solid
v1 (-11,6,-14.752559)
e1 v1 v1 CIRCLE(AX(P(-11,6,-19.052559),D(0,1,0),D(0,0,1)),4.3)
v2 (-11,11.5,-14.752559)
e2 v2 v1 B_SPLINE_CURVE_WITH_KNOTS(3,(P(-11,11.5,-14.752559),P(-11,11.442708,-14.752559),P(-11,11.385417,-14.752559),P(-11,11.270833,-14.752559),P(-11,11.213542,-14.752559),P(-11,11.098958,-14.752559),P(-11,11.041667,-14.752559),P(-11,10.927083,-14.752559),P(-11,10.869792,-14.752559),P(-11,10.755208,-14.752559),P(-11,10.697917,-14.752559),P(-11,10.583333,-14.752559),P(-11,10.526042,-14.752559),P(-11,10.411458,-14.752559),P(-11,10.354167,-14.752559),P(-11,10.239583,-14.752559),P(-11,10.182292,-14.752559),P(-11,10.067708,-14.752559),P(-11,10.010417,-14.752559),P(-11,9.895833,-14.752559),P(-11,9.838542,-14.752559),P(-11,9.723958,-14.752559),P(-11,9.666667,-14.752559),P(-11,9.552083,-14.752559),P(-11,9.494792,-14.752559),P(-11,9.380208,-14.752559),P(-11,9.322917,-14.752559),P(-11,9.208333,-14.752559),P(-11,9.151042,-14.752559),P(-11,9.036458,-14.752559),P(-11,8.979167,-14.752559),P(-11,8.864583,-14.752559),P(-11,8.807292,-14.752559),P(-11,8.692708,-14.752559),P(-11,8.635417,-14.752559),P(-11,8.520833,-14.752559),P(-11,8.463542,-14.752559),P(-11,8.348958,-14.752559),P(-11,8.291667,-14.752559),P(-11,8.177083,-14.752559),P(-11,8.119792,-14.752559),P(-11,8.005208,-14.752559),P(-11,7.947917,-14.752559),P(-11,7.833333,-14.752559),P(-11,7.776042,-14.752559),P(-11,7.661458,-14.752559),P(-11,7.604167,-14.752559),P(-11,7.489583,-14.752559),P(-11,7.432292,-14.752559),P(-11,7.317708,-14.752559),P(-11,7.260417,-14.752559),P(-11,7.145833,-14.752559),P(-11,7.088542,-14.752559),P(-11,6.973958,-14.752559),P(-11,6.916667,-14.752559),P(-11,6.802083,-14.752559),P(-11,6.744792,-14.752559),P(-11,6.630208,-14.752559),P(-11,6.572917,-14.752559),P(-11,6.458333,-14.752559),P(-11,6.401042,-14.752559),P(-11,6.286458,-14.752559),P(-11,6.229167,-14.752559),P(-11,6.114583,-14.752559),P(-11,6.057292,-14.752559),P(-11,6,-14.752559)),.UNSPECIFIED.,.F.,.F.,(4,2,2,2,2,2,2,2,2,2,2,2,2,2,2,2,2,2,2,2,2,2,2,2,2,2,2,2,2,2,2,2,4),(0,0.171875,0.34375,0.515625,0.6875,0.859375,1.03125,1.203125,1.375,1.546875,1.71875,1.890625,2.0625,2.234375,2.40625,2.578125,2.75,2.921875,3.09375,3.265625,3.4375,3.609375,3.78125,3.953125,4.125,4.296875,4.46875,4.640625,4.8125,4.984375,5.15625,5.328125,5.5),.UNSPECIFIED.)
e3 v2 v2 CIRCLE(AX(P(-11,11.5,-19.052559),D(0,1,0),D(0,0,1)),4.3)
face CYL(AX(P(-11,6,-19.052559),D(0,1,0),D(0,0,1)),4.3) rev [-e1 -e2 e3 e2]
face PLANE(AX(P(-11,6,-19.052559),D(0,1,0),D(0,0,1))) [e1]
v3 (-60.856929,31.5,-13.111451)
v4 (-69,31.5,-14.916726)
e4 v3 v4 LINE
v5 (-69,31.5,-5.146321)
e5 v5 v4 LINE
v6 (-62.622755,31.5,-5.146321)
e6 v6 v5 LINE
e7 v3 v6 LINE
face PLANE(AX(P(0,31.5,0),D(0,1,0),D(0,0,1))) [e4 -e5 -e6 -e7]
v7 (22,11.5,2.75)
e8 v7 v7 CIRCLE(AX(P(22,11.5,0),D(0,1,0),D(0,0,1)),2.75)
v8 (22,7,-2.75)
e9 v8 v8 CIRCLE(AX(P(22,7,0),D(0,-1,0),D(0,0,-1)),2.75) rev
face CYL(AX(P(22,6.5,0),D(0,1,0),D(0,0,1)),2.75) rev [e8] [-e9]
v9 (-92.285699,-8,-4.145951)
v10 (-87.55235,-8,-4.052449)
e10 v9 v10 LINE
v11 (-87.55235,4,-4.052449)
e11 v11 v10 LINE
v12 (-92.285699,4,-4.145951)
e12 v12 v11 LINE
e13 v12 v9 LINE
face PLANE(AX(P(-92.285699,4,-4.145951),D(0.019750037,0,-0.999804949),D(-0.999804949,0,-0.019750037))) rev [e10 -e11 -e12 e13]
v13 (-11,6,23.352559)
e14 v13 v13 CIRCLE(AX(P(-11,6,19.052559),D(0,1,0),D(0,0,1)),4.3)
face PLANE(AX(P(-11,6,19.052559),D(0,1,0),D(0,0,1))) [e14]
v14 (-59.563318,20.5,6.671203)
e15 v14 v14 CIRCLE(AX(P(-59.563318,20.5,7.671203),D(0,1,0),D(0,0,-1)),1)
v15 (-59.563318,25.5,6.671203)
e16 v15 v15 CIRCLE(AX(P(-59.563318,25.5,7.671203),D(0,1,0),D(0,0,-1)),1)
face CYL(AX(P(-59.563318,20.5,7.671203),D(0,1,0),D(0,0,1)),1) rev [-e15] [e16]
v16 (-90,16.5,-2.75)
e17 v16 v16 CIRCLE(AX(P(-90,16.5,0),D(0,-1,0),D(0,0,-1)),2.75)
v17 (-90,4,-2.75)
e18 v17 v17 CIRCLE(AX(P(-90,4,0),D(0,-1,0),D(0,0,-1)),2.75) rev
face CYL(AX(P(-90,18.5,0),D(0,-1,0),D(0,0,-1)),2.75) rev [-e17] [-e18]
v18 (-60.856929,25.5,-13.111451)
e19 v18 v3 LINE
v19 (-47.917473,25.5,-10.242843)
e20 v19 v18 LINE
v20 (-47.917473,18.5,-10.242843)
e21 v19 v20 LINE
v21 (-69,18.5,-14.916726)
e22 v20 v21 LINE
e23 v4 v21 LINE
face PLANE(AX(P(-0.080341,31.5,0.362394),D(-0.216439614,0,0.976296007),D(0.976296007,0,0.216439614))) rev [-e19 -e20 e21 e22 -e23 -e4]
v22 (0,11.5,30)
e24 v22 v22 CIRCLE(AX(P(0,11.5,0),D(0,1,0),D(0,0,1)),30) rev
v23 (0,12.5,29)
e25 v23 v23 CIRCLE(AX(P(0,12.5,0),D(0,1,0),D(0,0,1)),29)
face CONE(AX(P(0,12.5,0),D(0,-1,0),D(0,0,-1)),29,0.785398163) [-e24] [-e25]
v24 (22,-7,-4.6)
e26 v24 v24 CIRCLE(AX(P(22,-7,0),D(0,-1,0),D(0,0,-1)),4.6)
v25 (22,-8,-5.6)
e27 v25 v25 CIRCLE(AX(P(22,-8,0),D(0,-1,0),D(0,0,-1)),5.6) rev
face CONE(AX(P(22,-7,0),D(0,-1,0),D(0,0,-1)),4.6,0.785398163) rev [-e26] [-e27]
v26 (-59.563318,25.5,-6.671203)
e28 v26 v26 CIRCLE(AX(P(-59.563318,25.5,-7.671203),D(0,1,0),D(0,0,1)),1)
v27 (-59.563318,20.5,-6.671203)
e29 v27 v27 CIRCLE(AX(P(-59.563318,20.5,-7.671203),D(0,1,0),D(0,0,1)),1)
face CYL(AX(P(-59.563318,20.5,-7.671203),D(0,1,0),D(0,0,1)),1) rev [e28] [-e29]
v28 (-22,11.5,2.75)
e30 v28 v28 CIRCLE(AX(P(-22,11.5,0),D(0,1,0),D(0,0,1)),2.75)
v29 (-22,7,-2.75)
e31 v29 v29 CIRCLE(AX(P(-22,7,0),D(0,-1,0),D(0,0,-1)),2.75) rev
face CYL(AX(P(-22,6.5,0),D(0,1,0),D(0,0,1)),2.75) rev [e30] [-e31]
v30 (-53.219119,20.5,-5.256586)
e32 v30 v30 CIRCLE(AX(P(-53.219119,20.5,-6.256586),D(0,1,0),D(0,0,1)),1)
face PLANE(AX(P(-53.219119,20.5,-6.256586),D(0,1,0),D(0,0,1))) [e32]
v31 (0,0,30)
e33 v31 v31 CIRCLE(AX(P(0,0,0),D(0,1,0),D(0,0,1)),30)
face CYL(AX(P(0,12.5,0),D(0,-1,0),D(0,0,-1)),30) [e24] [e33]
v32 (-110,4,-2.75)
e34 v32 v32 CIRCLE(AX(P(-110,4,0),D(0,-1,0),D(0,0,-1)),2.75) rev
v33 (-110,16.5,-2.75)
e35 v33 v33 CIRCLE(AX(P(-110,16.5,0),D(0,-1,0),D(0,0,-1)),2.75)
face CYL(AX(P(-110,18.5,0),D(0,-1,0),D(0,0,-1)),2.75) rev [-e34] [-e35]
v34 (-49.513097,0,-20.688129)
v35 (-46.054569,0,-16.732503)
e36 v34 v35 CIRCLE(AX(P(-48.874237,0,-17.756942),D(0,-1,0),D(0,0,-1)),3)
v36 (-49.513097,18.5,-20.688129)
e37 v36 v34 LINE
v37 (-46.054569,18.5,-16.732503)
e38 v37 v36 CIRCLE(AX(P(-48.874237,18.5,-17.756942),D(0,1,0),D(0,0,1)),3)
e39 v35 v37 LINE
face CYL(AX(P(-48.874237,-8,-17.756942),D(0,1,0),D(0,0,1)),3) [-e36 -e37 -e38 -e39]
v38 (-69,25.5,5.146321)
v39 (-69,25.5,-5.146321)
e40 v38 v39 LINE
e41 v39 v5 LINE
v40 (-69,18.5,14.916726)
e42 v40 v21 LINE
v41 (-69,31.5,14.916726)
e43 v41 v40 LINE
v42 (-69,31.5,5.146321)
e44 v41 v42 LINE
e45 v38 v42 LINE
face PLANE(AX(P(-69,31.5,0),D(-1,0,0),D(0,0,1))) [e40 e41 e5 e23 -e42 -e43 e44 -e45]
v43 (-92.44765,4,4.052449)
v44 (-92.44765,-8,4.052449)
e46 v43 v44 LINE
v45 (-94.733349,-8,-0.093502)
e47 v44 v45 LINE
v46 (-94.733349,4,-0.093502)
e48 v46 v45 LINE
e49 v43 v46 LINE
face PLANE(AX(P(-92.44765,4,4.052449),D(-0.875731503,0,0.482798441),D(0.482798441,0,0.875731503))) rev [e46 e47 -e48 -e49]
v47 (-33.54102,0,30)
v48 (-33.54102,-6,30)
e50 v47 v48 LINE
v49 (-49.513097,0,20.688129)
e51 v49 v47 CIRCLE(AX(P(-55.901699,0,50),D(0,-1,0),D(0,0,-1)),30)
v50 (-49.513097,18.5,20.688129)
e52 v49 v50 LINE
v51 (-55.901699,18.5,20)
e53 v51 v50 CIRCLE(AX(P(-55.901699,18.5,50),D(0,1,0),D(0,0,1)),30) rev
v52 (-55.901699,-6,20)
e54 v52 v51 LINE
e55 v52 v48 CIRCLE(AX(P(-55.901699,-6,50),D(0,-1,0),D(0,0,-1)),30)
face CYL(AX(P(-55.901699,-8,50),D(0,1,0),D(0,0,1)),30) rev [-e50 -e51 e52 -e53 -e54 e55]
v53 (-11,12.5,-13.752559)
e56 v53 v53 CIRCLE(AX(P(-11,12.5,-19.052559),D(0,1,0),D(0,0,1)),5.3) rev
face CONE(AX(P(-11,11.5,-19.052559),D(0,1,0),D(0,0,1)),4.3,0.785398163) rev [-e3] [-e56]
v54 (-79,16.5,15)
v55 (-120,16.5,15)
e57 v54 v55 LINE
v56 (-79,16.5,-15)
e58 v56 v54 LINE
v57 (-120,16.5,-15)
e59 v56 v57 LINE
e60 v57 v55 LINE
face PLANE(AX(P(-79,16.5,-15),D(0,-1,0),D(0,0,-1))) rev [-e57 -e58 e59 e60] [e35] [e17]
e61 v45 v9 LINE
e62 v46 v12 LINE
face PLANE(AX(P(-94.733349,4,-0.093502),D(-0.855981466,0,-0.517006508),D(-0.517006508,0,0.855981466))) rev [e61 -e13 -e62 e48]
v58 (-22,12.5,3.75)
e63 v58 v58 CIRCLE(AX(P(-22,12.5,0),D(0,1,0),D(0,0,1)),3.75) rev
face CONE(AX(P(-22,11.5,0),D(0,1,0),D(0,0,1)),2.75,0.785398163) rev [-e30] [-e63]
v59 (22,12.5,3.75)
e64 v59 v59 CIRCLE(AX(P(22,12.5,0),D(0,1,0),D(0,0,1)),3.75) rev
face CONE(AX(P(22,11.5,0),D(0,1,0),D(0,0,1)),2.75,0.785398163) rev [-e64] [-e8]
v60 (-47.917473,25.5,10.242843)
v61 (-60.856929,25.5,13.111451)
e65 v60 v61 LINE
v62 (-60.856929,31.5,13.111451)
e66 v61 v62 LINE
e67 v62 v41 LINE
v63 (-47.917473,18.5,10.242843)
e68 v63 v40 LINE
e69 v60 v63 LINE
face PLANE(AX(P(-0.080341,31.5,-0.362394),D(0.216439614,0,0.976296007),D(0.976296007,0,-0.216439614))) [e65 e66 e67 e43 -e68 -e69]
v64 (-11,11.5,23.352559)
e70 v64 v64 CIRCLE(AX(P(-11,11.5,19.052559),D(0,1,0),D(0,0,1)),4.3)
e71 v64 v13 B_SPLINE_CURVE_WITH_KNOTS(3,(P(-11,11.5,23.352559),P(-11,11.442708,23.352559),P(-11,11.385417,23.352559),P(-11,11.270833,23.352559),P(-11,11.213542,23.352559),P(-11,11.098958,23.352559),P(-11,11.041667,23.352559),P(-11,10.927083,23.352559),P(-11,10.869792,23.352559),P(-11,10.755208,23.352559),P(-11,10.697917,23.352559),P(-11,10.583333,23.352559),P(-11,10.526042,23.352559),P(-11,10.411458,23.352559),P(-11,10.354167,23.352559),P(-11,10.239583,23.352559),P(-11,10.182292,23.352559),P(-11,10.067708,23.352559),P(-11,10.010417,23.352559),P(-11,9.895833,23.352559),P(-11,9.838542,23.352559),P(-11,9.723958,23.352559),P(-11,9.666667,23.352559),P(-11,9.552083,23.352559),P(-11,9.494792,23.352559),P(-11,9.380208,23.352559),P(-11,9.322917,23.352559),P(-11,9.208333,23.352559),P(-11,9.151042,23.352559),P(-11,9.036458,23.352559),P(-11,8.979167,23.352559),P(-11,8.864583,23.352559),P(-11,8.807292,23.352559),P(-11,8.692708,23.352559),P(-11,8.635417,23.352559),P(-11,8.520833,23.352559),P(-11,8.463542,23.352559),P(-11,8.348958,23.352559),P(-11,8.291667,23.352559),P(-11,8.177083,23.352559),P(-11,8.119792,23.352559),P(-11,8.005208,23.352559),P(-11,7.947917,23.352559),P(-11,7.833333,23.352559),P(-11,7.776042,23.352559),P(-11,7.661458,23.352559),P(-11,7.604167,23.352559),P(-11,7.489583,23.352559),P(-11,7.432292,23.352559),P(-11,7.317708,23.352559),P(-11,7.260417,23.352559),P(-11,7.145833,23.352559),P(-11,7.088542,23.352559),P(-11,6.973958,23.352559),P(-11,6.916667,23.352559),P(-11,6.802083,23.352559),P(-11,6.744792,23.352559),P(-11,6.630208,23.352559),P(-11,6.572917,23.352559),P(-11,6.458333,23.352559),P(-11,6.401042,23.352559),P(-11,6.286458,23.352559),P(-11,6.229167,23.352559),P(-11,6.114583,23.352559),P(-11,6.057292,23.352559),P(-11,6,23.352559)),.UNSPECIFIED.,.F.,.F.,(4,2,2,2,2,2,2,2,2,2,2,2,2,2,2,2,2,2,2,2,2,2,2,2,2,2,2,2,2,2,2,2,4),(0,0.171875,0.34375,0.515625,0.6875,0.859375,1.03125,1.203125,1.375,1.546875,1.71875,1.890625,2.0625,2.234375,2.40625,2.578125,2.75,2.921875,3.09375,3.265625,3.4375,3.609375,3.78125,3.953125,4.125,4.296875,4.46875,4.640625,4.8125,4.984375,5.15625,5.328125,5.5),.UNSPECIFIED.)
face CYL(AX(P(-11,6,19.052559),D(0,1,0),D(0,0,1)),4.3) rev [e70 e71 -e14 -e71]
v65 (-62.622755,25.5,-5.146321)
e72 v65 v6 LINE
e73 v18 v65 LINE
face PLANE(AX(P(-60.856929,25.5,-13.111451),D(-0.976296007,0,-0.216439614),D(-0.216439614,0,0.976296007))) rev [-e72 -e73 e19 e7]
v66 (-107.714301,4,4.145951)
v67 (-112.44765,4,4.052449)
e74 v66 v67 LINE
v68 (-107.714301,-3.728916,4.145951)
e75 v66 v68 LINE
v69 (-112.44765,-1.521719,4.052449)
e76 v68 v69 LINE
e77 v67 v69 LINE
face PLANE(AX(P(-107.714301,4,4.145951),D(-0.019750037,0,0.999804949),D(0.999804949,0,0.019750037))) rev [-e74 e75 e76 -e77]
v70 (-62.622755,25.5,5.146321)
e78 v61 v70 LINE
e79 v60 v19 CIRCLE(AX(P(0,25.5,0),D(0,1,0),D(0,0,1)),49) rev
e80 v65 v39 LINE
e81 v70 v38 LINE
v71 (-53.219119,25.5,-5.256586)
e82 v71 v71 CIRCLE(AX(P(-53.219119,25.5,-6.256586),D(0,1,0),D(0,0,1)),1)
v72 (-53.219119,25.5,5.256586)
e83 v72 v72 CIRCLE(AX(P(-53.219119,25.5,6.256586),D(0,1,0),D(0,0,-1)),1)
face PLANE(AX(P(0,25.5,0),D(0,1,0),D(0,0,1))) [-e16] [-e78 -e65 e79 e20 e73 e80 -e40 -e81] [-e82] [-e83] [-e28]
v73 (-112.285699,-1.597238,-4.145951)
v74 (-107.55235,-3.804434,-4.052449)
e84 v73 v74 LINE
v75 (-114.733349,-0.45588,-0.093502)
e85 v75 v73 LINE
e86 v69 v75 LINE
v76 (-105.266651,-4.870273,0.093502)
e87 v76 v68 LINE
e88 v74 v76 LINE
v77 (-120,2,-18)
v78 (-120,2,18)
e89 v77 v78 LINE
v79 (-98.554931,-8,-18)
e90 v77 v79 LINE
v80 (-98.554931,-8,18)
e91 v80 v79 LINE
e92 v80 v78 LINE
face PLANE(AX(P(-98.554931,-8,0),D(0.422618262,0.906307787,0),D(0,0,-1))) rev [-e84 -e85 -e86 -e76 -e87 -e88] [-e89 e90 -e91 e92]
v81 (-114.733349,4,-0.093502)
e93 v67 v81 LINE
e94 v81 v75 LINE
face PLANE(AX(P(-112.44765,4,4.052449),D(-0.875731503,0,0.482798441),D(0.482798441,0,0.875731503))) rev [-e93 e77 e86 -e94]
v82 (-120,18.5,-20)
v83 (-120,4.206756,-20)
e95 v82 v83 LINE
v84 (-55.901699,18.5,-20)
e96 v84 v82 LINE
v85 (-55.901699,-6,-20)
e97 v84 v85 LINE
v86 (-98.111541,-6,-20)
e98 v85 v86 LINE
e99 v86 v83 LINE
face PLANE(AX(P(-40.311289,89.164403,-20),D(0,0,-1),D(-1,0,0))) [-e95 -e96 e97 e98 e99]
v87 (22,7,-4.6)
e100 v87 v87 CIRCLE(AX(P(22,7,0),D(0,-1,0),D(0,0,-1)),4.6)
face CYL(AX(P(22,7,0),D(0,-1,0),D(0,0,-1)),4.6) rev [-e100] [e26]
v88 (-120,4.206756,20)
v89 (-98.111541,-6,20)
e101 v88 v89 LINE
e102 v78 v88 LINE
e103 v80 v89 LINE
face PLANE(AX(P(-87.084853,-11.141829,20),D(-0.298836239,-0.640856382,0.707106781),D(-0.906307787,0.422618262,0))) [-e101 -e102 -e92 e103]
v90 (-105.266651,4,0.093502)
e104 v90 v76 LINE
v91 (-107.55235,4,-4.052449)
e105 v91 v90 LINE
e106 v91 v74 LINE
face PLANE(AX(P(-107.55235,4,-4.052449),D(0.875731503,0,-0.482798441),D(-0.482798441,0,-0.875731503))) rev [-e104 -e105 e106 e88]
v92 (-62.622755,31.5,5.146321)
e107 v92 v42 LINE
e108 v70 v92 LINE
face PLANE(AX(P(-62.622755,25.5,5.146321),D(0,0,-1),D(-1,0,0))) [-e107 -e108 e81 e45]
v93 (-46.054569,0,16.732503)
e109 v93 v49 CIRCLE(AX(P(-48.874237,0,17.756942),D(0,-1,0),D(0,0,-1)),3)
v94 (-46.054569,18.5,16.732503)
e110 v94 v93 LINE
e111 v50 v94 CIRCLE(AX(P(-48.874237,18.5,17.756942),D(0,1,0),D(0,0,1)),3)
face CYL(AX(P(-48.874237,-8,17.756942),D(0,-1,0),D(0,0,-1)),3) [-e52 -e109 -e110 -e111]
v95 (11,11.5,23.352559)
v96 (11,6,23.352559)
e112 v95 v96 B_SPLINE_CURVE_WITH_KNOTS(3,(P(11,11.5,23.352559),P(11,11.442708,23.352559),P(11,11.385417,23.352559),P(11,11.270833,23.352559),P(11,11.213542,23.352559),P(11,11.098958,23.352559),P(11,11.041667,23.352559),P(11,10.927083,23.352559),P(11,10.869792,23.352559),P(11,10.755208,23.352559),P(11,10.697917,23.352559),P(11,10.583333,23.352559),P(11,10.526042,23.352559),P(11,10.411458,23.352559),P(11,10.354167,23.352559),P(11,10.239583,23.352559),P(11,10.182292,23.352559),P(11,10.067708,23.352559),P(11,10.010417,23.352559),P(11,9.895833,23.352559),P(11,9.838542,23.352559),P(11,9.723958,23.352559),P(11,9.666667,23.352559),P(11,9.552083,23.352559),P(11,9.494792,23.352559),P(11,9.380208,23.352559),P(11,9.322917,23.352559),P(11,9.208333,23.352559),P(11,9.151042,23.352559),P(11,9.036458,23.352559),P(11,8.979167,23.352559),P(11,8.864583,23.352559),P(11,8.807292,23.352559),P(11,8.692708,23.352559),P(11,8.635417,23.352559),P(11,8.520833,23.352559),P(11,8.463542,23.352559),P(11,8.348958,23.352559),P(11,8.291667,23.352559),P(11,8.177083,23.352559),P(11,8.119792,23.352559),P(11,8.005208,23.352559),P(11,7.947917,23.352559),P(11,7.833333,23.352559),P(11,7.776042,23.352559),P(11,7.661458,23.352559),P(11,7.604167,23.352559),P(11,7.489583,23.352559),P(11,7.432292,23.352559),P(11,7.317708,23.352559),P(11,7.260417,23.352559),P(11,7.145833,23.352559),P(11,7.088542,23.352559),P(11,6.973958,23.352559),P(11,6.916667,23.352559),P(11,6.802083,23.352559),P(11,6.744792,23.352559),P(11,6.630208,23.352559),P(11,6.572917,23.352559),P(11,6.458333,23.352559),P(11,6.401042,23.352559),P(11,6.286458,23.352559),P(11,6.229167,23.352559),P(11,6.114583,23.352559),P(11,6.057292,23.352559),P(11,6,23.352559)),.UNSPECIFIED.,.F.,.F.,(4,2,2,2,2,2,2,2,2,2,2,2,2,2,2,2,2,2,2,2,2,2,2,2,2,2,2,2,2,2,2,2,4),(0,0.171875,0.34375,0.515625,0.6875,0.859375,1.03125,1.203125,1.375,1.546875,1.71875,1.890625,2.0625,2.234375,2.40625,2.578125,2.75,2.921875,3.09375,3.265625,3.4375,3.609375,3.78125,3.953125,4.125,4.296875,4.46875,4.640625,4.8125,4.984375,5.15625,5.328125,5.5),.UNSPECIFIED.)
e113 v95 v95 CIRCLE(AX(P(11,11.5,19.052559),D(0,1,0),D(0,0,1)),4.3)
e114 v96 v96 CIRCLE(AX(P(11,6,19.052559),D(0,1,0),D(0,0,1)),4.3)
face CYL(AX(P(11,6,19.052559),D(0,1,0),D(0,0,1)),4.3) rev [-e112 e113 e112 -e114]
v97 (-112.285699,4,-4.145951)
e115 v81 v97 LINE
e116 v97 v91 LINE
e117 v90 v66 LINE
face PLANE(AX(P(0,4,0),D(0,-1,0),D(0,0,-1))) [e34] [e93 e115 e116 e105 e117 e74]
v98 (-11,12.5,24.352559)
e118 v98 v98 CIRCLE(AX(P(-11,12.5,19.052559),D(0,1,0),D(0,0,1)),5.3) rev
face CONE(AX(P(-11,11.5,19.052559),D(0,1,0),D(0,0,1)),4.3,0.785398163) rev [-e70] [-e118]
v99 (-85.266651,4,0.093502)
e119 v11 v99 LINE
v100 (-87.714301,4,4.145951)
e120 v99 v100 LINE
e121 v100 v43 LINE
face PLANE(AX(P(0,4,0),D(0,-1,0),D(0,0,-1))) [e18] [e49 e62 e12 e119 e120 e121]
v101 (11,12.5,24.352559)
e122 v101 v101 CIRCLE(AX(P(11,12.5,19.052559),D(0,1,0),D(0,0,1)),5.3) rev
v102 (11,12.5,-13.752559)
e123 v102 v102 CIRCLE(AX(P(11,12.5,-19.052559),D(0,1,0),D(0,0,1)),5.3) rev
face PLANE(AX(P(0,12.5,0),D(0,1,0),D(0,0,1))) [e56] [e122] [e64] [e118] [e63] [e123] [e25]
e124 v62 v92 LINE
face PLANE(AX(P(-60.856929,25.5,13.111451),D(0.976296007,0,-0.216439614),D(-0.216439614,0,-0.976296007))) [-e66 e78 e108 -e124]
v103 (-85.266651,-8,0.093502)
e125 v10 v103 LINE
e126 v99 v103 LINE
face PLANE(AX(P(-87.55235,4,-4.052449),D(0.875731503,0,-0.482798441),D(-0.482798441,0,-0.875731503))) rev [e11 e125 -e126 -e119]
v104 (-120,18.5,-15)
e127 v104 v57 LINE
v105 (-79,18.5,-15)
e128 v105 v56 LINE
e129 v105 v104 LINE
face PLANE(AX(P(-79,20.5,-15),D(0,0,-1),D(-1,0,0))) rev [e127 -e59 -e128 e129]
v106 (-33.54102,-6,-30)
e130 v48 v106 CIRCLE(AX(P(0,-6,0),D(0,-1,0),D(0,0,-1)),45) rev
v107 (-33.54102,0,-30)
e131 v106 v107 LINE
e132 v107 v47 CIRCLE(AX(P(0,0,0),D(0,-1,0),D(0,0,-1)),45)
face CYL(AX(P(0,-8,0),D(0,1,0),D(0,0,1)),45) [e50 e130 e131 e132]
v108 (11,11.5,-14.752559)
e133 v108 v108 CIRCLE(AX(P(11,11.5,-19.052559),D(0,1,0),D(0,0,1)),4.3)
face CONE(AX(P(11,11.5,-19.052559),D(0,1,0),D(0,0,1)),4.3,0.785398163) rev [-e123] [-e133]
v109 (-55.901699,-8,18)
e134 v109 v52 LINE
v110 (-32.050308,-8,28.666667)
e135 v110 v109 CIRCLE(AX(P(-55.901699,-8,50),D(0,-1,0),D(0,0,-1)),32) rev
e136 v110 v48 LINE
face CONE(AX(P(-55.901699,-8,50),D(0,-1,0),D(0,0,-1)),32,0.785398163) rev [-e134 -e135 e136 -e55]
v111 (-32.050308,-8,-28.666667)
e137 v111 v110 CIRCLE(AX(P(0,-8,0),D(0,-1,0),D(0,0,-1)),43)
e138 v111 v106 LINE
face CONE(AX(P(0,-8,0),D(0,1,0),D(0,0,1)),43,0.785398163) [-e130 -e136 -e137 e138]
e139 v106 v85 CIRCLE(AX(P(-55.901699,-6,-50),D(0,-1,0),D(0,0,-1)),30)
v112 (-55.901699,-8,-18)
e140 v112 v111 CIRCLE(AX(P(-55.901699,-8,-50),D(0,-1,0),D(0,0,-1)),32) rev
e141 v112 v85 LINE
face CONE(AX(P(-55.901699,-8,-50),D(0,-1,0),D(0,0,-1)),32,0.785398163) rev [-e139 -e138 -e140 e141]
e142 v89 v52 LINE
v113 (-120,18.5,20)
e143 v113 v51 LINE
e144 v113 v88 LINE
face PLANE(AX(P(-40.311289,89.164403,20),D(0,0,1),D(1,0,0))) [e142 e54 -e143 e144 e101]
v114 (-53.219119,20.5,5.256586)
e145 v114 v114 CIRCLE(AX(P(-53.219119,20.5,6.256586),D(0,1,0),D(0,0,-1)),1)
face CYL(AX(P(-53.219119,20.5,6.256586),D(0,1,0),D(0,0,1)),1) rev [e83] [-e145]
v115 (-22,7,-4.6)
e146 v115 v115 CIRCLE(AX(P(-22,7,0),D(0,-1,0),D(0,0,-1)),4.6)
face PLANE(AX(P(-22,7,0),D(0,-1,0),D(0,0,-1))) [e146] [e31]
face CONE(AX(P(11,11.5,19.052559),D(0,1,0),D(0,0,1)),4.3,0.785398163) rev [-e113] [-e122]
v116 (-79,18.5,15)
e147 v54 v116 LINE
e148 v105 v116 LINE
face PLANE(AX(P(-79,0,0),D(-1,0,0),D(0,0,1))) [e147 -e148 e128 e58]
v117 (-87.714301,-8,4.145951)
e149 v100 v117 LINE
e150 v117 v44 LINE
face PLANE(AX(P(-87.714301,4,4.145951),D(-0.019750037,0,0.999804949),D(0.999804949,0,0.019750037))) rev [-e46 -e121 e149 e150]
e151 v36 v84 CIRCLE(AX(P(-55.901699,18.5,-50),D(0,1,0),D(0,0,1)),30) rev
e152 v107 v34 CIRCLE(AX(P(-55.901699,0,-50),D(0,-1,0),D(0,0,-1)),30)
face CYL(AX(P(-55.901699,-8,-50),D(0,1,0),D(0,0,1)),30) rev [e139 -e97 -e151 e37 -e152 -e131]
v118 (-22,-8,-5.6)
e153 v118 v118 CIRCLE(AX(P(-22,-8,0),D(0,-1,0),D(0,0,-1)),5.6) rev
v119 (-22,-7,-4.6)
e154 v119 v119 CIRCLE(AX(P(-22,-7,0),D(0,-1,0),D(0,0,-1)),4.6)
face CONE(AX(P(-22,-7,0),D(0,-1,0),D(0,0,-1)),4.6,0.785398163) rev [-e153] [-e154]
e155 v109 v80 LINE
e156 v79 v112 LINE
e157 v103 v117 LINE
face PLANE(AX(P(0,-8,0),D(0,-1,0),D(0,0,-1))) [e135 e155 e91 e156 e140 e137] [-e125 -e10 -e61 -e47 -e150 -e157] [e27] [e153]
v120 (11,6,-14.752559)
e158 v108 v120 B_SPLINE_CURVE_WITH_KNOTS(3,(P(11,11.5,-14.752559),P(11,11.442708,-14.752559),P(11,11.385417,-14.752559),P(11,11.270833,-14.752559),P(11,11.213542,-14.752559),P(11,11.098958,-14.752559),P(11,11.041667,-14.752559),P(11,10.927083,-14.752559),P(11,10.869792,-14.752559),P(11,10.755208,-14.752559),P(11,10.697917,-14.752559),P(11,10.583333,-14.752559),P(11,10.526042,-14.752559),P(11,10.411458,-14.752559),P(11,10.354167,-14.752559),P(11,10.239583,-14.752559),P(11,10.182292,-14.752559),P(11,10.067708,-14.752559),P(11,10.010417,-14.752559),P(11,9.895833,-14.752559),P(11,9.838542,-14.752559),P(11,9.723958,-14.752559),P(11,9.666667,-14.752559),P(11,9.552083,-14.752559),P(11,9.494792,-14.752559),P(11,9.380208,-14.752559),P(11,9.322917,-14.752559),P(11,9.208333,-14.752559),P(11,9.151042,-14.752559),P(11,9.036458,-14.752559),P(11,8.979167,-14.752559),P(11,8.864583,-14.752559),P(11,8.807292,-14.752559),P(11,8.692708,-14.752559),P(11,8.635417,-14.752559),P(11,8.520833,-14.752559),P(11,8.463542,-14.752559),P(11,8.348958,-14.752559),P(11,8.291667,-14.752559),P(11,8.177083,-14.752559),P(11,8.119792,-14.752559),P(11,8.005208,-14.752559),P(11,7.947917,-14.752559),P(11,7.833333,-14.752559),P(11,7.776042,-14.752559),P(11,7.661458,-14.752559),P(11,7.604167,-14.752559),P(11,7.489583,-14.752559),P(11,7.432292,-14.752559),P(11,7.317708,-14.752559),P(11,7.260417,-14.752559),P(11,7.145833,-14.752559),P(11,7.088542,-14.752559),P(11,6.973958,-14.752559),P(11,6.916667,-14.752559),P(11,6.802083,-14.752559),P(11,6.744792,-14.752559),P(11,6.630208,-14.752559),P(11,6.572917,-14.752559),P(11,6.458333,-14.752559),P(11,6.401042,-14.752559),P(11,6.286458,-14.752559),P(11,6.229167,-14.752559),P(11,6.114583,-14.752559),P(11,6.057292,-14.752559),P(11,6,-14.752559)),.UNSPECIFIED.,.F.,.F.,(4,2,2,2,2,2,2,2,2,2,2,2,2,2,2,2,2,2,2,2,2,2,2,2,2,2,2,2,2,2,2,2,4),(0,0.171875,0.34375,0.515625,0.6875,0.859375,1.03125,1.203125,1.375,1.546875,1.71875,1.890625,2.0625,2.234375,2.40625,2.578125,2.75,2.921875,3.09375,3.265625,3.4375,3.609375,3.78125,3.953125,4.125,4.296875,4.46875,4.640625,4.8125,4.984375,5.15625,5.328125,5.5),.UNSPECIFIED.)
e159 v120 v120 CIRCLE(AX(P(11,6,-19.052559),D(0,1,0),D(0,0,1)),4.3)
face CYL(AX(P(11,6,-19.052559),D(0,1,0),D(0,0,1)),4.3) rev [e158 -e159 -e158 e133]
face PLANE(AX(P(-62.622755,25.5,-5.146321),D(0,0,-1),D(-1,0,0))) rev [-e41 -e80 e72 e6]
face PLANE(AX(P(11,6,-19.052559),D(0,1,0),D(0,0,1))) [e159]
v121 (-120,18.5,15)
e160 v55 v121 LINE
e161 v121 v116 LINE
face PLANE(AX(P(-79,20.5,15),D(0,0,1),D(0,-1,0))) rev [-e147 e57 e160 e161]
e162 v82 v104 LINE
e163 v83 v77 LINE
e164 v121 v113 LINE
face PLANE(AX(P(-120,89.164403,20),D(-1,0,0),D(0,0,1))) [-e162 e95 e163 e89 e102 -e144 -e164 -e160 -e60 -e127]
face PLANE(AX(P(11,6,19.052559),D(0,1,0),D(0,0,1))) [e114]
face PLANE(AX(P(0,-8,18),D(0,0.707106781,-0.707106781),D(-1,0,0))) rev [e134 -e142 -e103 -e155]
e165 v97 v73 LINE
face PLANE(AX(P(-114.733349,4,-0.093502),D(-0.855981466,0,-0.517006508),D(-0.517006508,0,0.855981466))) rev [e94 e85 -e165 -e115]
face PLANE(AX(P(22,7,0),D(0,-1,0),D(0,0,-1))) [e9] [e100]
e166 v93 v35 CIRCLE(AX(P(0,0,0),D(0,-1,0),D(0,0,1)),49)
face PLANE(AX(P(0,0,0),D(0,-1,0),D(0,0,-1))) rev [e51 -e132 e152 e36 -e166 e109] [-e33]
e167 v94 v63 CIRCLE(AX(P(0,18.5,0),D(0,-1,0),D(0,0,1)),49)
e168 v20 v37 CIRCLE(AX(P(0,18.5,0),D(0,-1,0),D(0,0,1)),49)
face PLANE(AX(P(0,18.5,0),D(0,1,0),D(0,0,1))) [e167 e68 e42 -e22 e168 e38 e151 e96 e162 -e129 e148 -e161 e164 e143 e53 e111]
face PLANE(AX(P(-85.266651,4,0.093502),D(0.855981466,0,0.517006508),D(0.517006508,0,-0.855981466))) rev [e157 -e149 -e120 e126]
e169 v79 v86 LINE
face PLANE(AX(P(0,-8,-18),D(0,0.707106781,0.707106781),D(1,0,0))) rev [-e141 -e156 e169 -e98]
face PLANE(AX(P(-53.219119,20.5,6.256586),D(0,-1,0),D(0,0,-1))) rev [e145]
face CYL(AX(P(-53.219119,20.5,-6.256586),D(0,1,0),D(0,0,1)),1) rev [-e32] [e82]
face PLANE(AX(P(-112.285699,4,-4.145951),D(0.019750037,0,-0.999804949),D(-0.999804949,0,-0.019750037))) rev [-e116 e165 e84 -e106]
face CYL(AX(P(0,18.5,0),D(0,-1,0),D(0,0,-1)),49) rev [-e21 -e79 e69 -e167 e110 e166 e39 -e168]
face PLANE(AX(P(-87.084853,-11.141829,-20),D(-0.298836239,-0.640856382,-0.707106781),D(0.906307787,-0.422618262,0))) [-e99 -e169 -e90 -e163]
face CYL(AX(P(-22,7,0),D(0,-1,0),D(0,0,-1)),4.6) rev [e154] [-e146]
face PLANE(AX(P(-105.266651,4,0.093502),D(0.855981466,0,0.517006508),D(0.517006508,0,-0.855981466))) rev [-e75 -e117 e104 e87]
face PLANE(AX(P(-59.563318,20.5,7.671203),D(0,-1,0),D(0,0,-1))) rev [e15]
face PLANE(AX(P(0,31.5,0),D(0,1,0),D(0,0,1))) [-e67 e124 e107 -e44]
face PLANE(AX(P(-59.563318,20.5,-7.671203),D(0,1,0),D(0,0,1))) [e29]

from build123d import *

# Parameters (mm, degrees)
SKETCH1_R           = 30
BOSS_EXTRUDE1_DEPTH = 12.5
SKETCH3_R           = 45.00000000000001
BOSS_EXTRUDE3_DEPTH = 8
SKETCH17_R          = 2.7499999999999982
CUT_EXTRUDE9_DEPTH  = 6
SKETCH19_R          = 4.3
SKETCH19_R_2        = 4.299999999999999
CUT_EXTRUDE12_DEPTH = 6.5
BOSS_EXTRUDE5_START = -8
BOSS_EXTRUDE5_DEPTH = 8
BOSS_EXTRUDE6_DEPTH = 18.5
FILLET1_R           = 30
CUT_EXTRUDE14_DEPTH = 41
SKETCH26_R          = 2.750000000000008
CUT_EXTRUDE15_DEPTH = 131.87111980876452
CUT_EXTRUDE16_DEPTH = 12
BOSS_EXTRUDE7_DEPTH = 13
CUT_EXTRUDE21_DEPTH = 6
SKETCH34_R          = 0.9999999999999991
SKETCH34_R_2        = 0.9999999999999933
SKETCH34_R_3        = 0.9999999999999983
SKETCH34_R_4        = 0.9999999999999981
CUT_EXTRUDE22_DEPTH = 5
CHAMFER4_SIZE       = 1
CHAMFER5_SIZE       = 1
SKETCH35_R          = 4.599999999999999
CUT_EXTRUDE23_DEPTH = 15
FILLET3_R           = 3
CHAMFER6_SIZE       = 21.445069205
CHAMFER6_SIZE_2     = 10
CHAMFER7_SIZE       = 2
CHAMFER8_SIZE       = 1
SKETCH37_W          = 12.834846050171066
SKETCH37_H          = 29.012722943474188
CUT_EXTRUDE24_DEPTH = 15


with BuildPart() as part:
    # Sketch1 → Boss-Extrude1 (new body)
    with BuildSketch(Plane(origin=(0, 0, 0), x_dir=(1, 0, 0), z_dir=(0, 1, 0))):
        with Locations(Location((0, 0, 0), (0, 0, 270))):
            Circle(SKETCH1_R)
    extrude(amount=BOSS_EXTRUDE1_DEPTH)

    # Sketch3 → Boss-Extrude3 (add)
    with BuildSketch(Plane.XZ):
        with Locations(Location((0, 0, 0), (0, 0, 270))):
            Circle(SKETCH3_R)
    extrude(amount=BOSS_EXTRUDE3_DEPTH)

    # Sketch17 → Cut-Extrude9 (cut)
    with BuildSketch(Plane(origin=(0, 12.5, 0), x_dir=(1, 0, 0), z_dir=(0, 1, 0))):
        with Locations(Location((22, 2.69e-15, 0), (0, 0, 270))):
            Circle(SKETCH17_R)
        with Locations(Location((-22, 0, 0), (0, 0, 270))):
            Circle(SKETCH17_R)
    extrude(amount=-CUT_EXTRUDE9_DEPTH, mode=Mode.SUBTRACT)

    # Sketch19 → Cut-Extrude12 (cut)
    with BuildSketch(Plane(origin=(0, 12.5, 0), x_dir=(1, 0, 0), z_dir=(0, 1, 0))):
        with Locations(Location((-10.999999999999986, -19.05255888325766, 0), (0, 0, 270))):
            Circle(SKETCH19_R)
        with Locations(Location((11.00000000000001, -19.05255888325765, 0), (0, 0, 270))):
            Circle(SKETCH19_R_2)
        with Locations(Location((10.999999999999993, 19.052558883257653, 0), (0, 0, 270))):
            Circle(SKETCH19_R_2)
        with Locations(Location((-11.000000000000007, 19.05255888325765, 0), (0, 0, 270))):
            Circle(SKETCH19_R)
    extrude(amount=-CUT_EXTRUDE12_DEPTH, mode=Mode.SUBTRACT)

    # Sketch22 → Boss-Extrude5 (add)
    with BuildSketch(Plane.XZ.offset(8).offset(BOSS_EXTRUDE5_START)):
        with BuildLine():
            Line((-40.31128874149275, 20), (-120, 19.999999999999993))
            Line((-120, 19.999999999999993), (-120, -20.000000000000007))
            Line((-120, -20.000000000000007), (-40.31128874149276, -20))
            ThreePointArc((-40.31128874149276, -20), (-45.00000000000001, 5.51e-15), (-40.31128874149275, 20))
        make_face()
    extrude(amount=BOSS_EXTRUDE5_DEPTH)

    # Sketch24 → Boss-Extrude6 (add)
    with BuildSketch(Plane(origin=(0, 0, 0), x_dir=(1, 0, 0), z_dir=(0, 1, 0))):
        with BuildLine():
            Line((-120, -20), (-44.73253849269008, -20))
            ThreePointArc((-44.73253849269008, -20), (-49, 6e-15), (-44.73253849269009, 19.999999999999986))
            Line((-44.73253849269009, 19.999999999999986), (-120, 20))
            Line((-120, 20), (-120, -20))
        make_face()
    extrude(amount=BOSS_EXTRUDE6_DEPTH)

    # Fillet1
    # the kernel refuses this fillet: 30 mm, written as the material it adds along each edge
    with BuildSketch(Plane(origin=(-40.31128874149275, 38.97602674000499, -20.000000000000004), x_dir=(0.5606253720867512, 0, -0.8280695575690438), z_dir=(0, -1, 0))) as fillet1_piece_1_section:
        with BuildLine():
            CenterArc((16.10170692963991, -29.728705649960602), FILLET1_R, 97.7112574672678, 48.1896851042214)
            Line((-8.740379797431398, -12.90994448735806), (0, 0))
            ThreePointArc((0, 0), (6.038140098614967, -0.4069415250591067), (12.076280197229933, 2.1e-16))
        make_face()
    fillet1_piece_1 = extrude(amount=46.97602674000499, mode=Mode.PRIVATE)
    fillet1_piece_1 = split(fillet1_piece_1, bisect_by=Plane(origin=(-48.427696817915454, 0, -20.33565433426988), z_dir=(0, 1, 0)), keep=Keep.TOP, mode=Mode.PRIVATE)
    fillet1_piece_1 = fillet1_piece_1 - Plane(origin=(8.882e-14, 9.24999999999995, -1.78e-15), x_dir=(-0.9129089488304102, 0, 0.4081632653061218), z_dir=(0, -1, 0)) * Cylinder(49.00000000000008, 146, mode=Mode.PRIVATE)
    fillet1_piece_1 = split(fillet1_piece_1, bisect_by=Plane(origin=(-48.427696817915454, 18.5, -20.33565433426988), z_dir=(0, -1, 0)), keep=Keep.TOP, mode=Mode.PRIVATE)
    add(fillet1_piece_1)
    with BuildSketch(Plane(origin=(-40.31128874149276, 0, -20), x_dir=(0.5606253720867515, 0, -0.8280695575690435), z_dir=(0, -1, 0))) as fillet1_piece_2_section:
        with BuildLine():
            CenterArc((16.101706929639906, -29.728705649960602), FILLET1_R, 97.71125746726779, 48.18968510422141)
            Line((-8.740379797431395, -12.909944487358054), (0, 0))
            ThreePointArc((0, 0), (6.038140098614973, -0.4069415250591045), (12.076280197229938, 4.4e-16))
        make_face()
    fillet1_piece_2 = extrude(amount=8, mode=Mode.PRIVATE)
    fillet1_piece_2 = fillet1_piece_2 & Plane(origin=(8.882e-14, -4, -1.78e-15), x_dir=(-0.9129089488304102, 0, 0.4081632653061218), z_dir=(0, -1, 0)) * Cylinder(49.00000000000008, 68, mode=Mode.PRIVATE)
    add(fillet1_piece_2)
    with BuildSketch(Plane(origin=(-40.31128874149276, 0, -20), x_dir=(0.5606253720867515, 0, -0.8280695575690435), z_dir=(0, -1, 0))) as fillet1_piece_3_section:
        with BuildLine():
            CenterArc((16.101706929639906, -29.728705649960602), FILLET1_R, 97.71125746726779, 48.18968510422141)
            Line((-8.740379797431395, -12.909944487358054), (0, 0))
            ThreePointArc((0, 0), (6.038140098614973, -0.4069415250591045), (12.076280197229938, 4.4e-16))
        make_face()
    fillet1_piece_3 = extrude(amount=8, mode=Mode.PRIVATE)
    fillet1_piece_3 = fillet1_piece_3 - Plane(origin=(8.882e-14, -4, -1.78e-15), x_dir=(-0.9129089488304102, 0, 0.4081632653061218), z_dir=(0, -1, 0)) * Cylinder(49.00000000000008, 68, mode=Mode.PRIVATE)
    add(fillet1_piece_3)
    with BuildSketch(Plane(origin=(-40.31128874149275, 38.97602674000499, 20), x_dir=(0.5606253720867513, 0, 0.8280695575690437), z_dir=(0, -1, 0))) as fillet1_piece_4_section:
        with BuildLine():
            CenterArc((16.10170692963994, 29.7287056499606), FILLET1_R, 214.09905742851078, 48.18968510422144)
            Line((-8.740379797431375, 12.909944487358066), (0, 0))
            ThreePointArc((0, 0), (6.0381400986150044, 0.4069415250591079), (12.076280197229954, 2e-16))
        make_face()
    fillet1_piece_4 = extrude(amount=46.97602674000499, mode=Mode.PRIVATE)
    fillet1_piece_4 = split(fillet1_piece_4, bisect_by=Plane(origin=(-48.42769681791544, 0, 20.335654334269947), z_dir=(0, 1, 0)), keep=Keep.TOP, mode=Mode.PRIVATE)
    fillet1_piece_4 = split(fillet1_piece_4, bisect_by=Plane(origin=(-48.42769681791544, 18.5, 20.335654334269947), z_dir=(0, -1, 0)), keep=Keep.TOP, mode=Mode.PRIVATE)
    fillet1_piece_4 = fillet1_piece_4 - Plane(origin=(8.882e-14, 9.250000000000002, -1.78e-15), x_dir=(-0.9129089488304102, 0, 0.4081632653061218), z_dir=(0, -1, 0)) * Cylinder(49.00000000000008, 146, mode=Mode.PRIVATE)
    add(fillet1_piece_4)
    with BuildSketch(Plane(origin=(-40.31128874149275, 0, 20.000000000000004), x_dir=(0.5606253720867515, 0, 0.8280695575690435), z_dir=(0, -1, 0))) as fillet1_piece_5_section:
        with BuildLine():
            CenterArc((16.10170692963993, 29.728705649960602), FILLET1_R, 214.0990574285108, 48.18968510422138)
            Line((-8.74037979743138, 12.909944487358063), (0, 0))
            ThreePointArc((0, 0), (6.038140098615002, 0.4069415250591069), (12.07628019722995, 2.1e-16))
        make_face()
    fillet1_piece_5 = extrude(amount=8, mode=Mode.PRIVATE)
    fillet1_piece_5 = fillet1_piece_5 & Plane(origin=(8.882e-14, -4, -1.78e-15), x_dir=(-0.9129089488304102, 0, 0.4081632653061218), z_dir=(0, -1, 0)) * Cylinder(49.00000000000008, 68, mode=Mode.PRIVATE)
    add(fillet1_piece_5)
    with BuildSketch(Plane(origin=(-40.31128874149275, 0, 20.000000000000004), x_dir=(0.5606253720867515, 0, 0.8280695575690435), z_dir=(0, -1, 0))) as fillet1_piece_6_section:
        with BuildLine():
            CenterArc((16.10170692963993, 29.728705649960602), FILLET1_R, 214.0990574285108, 48.18968510422138)
            Line((-8.74037979743138, 12.909944487358063), (0, 0))
            ThreePointArc((0, 0), (6.038140098615002, 0.4069415250591069), (12.07628019722995, 2.1e-16))
        make_face()
    fillet1_piece_6 = extrude(amount=8, mode=Mode.PRIVATE)
    fillet1_piece_6 = fillet1_piece_6 - Plane(origin=(8.882e-14, -3.9999999999999996, -1.78e-15), x_dir=(-0.9129089488304102, 0, 0.4081632653061218), z_dir=(0, -1, 0)) * Cylinder(49.00000000000008, 68, mode=Mode.PRIVATE)
    add(fillet1_piece_6)

    # Sketch25 → Cut-Extrude14 (cut)
    with BuildSketch(Plane.ZY.offset(120)):
        Polygon((-15, 20.5), (14.999999999999998, 20.500000000000004), (15, 16.5), (-15, 16.5), align=None)
    extrude(amount=-CUT_EXTRUDE14_DEPTH, mode=Mode.SUBTRACT)

    # Sketch26 → Cut-Extrude15 (cut, through all)
    with BuildSketch(Plane.XZ.offset(8)):
        with Locations(Location((-110, 0, 0), (0, 0, 270))):
            Circle(SKETCH26_R)
        with Locations(Location((-90, 0, 0), (0, 0, 270))):
            Circle(SKETCH26_R)
    extrude(amount=-CUT_EXTRUDE15_DEPTH, mode=Mode.SUBTRACT)

    # Sketch27 → Cut-Extrude16 (cut)
    with BuildSketch(Plane.XZ.offset(8)):
        Polygon((-94.73334878284524, -0.09350204955340616), (-92.28569924120347, -4.14595131569283), (-87.55235045835822, -4.052449266139432), (-85.26665121715473, 0.09350204955341612), (-87.71430075879651, 4.145951315692857), (-92.44764954164177, 4.052449266139459), align=None)
        Polygon((-114.73334878284524, -0.09350204955339836), (-112.28569924120346, -4.14595131569285), (-107.55235045835823, -4.052449266139453), (-105.26665121715476, 0.09350204955340193), (-107.71430075879653, 4.145951315692842), (-112.44764954164177, 4.052449266139446), align=None)
    extrude(amount=-CUT_EXTRUDE16_DEPTH, mode=Mode.SUBTRACT)

    # Sketch31 → Boss-Extrude7 (add)
    with BuildSketch(Plane(origin=(0, 18.5, 0), x_dir=(1, 0, 0), z_dir=(0, 1, 0))):
        with BuildLine():
            Line((-69, -1.73e-15), (-49, -6e-17))
            ThreePointArc((-49, -1.78e-15), (-48.72861661672606, 5.149943943396856), (-47.91747254611715, 10.242842612874112))
            Line((-47.91747254611715, 10.242842612874112), (-69, 14.916726424423207))
            Line((-69, 14.916726424423207), (-69, -1.78e-15))
        make_face()
        with BuildLine():
            ThreePointArc((-47.91747254611714, -10.242842612874123), (-48.72861661672604, -5.149943943396865), (-49, -1.78e-15))
            Line((-49, -6e-17), (-69, -1.73e-15))
            Line((-69, -1.78e-15), (-69, -14.91672642442321))
            Line((-69, -14.91672642442321), (-47.917472546117146, -10.242842612874112))
        make_face()
    extrude(amount=BOSS_EXTRUDE7_DEPTH)

    # Sketch33 → Cut-Extrude21 (cut)
    with BuildSketch(Plane(origin=(0, 31.5, 0), x_dir=(1, 0, 0), z_dir=(0, 1, 0))):
        Polygon((-47.872191811225676, -10.232804115628124), (-60.856928705920794, -13.111450981004902), (-62.6227554893575, -5.146321092962614), (-69, -5.1463210929626175), (-69, 5.146321092962605), (-62.6227554893575, 5.1463210929626175), (-60.856928705920794, 13.111450981004895), (-47.872191811225676, 10.23280411562812), (-49.483408051793795, 2.9650773180589796), (-49.483408051793795, -2.965077318058979), align=None)
    extrude(amount=-CUT_EXTRUDE21_DEPTH, mode=Mode.SUBTRACT)

    # Sketch34 → Cut-Extrude22 (cut)
    with BuildSketch(Plane(origin=(0, 25.500000000000004, 0), x_dir=(1, 0, 0), z_dir=(0, 1, 0))):
        with Locations(Location((-53.219119349326604, -6.25658623597791, 0), (0, 0, 90))):
            Circle(SKETCH34_R)
        with Locations(Location((-59.56331832475562, -7.67120256564663, 0), (0, 0, 90))):
            Circle(SKETCH34_R_2)
        with Locations(Location((-59.563318324755585, 7.671202565646677, 0), (0, 0, 270))):
            Circle(SKETCH34_R_3)
        with Locations(Location((-53.219119349326576, 6.256586235977926, 0), (0, 0, 270))):
            Circle(SKETCH34_R_4)
    extrude(amount=-CUT_EXTRUDE22_DEPTH, mode=Mode.SUBTRACT)

    # Chamfer4
    chamfer4_edges = [part.edges().sort_by_distance(p)[0] for p in [
        (2.251e-14, 12.5, -30),
    ]]
    chamfer(chamfer4_edges, length=CHAMFER4_SIZE)

    # Chamfer5
    chamfer5_edges = [part.edges().sort_by_distance(p)[0] for p in [
        (22.000000000000004, 12.5, -2.750000000000001),
        (-21.999999999999996, 12.5, -2.7499999999999982),
        (-11.000000000000005, 12.5, -23.35255888325765),
        (10.999999999999995, 12.5, -23.35255888325765),
        (11.000000000000012, 12.5, 14.75255888325765),
        (-10.999999999999984, 12.5, 14.75255888325766),
    ]]
    chamfer(chamfer5_edges, length=CHAMFER5_SIZE)

    # Sketch35 → Cut-Extrude23 (cut)
    with BuildSketch(Plane.XZ.offset(8)):
        with Locations(Location((-22, 0, 0), (0, 0, 270))):
            Circle(SKETCH35_R)
        with Locations(Location((22, -2.69e-15, 0), (0, 0, 270))):
            Circle(SKETCH35_R)
    extrude(amount=-CUT_EXTRUDE23_DEPTH, mode=Mode.SUBTRACT)

    # Fillet3
    fillet3_edges = [part.edges().sort_by_distance(p)[0] for p in [
        (-43.41261753423428, 9.25, -22.723218056126946),
        (-43.41261753423428, 9.25, 22.723218056126946),
    ]]
    fillet(fillet3_edges, radius=FILLET3_R)

    # Chamfer6
    # the kernel refuses this chamfer: 21.445069205, 10 mm, written as the material it takes off along each edge
    with BuildSketch(Plane(origin=(-120, -8, 75.56364829338284), x_dir=(0.9998669641130703, -0.01631116413111024, 0), z_dir=(0, 0, -1))) as chamfer6_piece_1:
        Polygon((CHAMFER6_SIZE * 0.999866964118, -CHAMFER6_SIZE * 0.0163111641312), (-CHAMFER6_SIZE_2 * 0.0163111641311, -CHAMFER6_SIZE_2 * 0.999866964113), (0, 0), align=None)
    extrude(amount=151.12729658676568, mode=Mode.SUBTRACT)

    # Chamfer7
    chamfer7_edges = [part.edges().sort_by_distance(p)[0] for p in [
        (-77.22831511619461, -8, -20.000000000000004),
        (-109.27746539744713, -2.9999999999993143, -20.000000000000018),
        (-109.27746539744714, -2.9999999999993143, 19.999999999999982),
        (45.00000000000001, -8, 3.55e-15),
        (-77.22831511619461, -8, 19.999999999999996),
        (-43.654250723578656, -8, -22.61387212474282),
        (-43.65425072357866, -8, 22.613872124742816),
    ]]
    chamfer(chamfer7_edges, length=CHAMFER7_SIZE)

    # Chamfer8
    chamfer8_edges = [part.edges().sort_by_distance(p)[0] for p in [
        (-22, -8, 4.599999999999999),
        (22, -8, 4.599999999999996),
    ]]
    chamfer(chamfer8_edges, length=CHAMFER8_SIZE)

    # Sketch37 → Cut-Extrude24 (cut)
    with BuildSketch(Plane(origin=(0, 25.500000000000004, 0), x_dir=(1, 0, 0), z_dir=(0, 1, 0))):
        with Locations((-49, 5.33e-15)):
            Rectangle(SKETCH37_W, SKETCH37_H)
    extrude(amount=CUT_EXTRUDE24_DEPTH, mode=Mode.SUBTRACT)


solid = part.part
